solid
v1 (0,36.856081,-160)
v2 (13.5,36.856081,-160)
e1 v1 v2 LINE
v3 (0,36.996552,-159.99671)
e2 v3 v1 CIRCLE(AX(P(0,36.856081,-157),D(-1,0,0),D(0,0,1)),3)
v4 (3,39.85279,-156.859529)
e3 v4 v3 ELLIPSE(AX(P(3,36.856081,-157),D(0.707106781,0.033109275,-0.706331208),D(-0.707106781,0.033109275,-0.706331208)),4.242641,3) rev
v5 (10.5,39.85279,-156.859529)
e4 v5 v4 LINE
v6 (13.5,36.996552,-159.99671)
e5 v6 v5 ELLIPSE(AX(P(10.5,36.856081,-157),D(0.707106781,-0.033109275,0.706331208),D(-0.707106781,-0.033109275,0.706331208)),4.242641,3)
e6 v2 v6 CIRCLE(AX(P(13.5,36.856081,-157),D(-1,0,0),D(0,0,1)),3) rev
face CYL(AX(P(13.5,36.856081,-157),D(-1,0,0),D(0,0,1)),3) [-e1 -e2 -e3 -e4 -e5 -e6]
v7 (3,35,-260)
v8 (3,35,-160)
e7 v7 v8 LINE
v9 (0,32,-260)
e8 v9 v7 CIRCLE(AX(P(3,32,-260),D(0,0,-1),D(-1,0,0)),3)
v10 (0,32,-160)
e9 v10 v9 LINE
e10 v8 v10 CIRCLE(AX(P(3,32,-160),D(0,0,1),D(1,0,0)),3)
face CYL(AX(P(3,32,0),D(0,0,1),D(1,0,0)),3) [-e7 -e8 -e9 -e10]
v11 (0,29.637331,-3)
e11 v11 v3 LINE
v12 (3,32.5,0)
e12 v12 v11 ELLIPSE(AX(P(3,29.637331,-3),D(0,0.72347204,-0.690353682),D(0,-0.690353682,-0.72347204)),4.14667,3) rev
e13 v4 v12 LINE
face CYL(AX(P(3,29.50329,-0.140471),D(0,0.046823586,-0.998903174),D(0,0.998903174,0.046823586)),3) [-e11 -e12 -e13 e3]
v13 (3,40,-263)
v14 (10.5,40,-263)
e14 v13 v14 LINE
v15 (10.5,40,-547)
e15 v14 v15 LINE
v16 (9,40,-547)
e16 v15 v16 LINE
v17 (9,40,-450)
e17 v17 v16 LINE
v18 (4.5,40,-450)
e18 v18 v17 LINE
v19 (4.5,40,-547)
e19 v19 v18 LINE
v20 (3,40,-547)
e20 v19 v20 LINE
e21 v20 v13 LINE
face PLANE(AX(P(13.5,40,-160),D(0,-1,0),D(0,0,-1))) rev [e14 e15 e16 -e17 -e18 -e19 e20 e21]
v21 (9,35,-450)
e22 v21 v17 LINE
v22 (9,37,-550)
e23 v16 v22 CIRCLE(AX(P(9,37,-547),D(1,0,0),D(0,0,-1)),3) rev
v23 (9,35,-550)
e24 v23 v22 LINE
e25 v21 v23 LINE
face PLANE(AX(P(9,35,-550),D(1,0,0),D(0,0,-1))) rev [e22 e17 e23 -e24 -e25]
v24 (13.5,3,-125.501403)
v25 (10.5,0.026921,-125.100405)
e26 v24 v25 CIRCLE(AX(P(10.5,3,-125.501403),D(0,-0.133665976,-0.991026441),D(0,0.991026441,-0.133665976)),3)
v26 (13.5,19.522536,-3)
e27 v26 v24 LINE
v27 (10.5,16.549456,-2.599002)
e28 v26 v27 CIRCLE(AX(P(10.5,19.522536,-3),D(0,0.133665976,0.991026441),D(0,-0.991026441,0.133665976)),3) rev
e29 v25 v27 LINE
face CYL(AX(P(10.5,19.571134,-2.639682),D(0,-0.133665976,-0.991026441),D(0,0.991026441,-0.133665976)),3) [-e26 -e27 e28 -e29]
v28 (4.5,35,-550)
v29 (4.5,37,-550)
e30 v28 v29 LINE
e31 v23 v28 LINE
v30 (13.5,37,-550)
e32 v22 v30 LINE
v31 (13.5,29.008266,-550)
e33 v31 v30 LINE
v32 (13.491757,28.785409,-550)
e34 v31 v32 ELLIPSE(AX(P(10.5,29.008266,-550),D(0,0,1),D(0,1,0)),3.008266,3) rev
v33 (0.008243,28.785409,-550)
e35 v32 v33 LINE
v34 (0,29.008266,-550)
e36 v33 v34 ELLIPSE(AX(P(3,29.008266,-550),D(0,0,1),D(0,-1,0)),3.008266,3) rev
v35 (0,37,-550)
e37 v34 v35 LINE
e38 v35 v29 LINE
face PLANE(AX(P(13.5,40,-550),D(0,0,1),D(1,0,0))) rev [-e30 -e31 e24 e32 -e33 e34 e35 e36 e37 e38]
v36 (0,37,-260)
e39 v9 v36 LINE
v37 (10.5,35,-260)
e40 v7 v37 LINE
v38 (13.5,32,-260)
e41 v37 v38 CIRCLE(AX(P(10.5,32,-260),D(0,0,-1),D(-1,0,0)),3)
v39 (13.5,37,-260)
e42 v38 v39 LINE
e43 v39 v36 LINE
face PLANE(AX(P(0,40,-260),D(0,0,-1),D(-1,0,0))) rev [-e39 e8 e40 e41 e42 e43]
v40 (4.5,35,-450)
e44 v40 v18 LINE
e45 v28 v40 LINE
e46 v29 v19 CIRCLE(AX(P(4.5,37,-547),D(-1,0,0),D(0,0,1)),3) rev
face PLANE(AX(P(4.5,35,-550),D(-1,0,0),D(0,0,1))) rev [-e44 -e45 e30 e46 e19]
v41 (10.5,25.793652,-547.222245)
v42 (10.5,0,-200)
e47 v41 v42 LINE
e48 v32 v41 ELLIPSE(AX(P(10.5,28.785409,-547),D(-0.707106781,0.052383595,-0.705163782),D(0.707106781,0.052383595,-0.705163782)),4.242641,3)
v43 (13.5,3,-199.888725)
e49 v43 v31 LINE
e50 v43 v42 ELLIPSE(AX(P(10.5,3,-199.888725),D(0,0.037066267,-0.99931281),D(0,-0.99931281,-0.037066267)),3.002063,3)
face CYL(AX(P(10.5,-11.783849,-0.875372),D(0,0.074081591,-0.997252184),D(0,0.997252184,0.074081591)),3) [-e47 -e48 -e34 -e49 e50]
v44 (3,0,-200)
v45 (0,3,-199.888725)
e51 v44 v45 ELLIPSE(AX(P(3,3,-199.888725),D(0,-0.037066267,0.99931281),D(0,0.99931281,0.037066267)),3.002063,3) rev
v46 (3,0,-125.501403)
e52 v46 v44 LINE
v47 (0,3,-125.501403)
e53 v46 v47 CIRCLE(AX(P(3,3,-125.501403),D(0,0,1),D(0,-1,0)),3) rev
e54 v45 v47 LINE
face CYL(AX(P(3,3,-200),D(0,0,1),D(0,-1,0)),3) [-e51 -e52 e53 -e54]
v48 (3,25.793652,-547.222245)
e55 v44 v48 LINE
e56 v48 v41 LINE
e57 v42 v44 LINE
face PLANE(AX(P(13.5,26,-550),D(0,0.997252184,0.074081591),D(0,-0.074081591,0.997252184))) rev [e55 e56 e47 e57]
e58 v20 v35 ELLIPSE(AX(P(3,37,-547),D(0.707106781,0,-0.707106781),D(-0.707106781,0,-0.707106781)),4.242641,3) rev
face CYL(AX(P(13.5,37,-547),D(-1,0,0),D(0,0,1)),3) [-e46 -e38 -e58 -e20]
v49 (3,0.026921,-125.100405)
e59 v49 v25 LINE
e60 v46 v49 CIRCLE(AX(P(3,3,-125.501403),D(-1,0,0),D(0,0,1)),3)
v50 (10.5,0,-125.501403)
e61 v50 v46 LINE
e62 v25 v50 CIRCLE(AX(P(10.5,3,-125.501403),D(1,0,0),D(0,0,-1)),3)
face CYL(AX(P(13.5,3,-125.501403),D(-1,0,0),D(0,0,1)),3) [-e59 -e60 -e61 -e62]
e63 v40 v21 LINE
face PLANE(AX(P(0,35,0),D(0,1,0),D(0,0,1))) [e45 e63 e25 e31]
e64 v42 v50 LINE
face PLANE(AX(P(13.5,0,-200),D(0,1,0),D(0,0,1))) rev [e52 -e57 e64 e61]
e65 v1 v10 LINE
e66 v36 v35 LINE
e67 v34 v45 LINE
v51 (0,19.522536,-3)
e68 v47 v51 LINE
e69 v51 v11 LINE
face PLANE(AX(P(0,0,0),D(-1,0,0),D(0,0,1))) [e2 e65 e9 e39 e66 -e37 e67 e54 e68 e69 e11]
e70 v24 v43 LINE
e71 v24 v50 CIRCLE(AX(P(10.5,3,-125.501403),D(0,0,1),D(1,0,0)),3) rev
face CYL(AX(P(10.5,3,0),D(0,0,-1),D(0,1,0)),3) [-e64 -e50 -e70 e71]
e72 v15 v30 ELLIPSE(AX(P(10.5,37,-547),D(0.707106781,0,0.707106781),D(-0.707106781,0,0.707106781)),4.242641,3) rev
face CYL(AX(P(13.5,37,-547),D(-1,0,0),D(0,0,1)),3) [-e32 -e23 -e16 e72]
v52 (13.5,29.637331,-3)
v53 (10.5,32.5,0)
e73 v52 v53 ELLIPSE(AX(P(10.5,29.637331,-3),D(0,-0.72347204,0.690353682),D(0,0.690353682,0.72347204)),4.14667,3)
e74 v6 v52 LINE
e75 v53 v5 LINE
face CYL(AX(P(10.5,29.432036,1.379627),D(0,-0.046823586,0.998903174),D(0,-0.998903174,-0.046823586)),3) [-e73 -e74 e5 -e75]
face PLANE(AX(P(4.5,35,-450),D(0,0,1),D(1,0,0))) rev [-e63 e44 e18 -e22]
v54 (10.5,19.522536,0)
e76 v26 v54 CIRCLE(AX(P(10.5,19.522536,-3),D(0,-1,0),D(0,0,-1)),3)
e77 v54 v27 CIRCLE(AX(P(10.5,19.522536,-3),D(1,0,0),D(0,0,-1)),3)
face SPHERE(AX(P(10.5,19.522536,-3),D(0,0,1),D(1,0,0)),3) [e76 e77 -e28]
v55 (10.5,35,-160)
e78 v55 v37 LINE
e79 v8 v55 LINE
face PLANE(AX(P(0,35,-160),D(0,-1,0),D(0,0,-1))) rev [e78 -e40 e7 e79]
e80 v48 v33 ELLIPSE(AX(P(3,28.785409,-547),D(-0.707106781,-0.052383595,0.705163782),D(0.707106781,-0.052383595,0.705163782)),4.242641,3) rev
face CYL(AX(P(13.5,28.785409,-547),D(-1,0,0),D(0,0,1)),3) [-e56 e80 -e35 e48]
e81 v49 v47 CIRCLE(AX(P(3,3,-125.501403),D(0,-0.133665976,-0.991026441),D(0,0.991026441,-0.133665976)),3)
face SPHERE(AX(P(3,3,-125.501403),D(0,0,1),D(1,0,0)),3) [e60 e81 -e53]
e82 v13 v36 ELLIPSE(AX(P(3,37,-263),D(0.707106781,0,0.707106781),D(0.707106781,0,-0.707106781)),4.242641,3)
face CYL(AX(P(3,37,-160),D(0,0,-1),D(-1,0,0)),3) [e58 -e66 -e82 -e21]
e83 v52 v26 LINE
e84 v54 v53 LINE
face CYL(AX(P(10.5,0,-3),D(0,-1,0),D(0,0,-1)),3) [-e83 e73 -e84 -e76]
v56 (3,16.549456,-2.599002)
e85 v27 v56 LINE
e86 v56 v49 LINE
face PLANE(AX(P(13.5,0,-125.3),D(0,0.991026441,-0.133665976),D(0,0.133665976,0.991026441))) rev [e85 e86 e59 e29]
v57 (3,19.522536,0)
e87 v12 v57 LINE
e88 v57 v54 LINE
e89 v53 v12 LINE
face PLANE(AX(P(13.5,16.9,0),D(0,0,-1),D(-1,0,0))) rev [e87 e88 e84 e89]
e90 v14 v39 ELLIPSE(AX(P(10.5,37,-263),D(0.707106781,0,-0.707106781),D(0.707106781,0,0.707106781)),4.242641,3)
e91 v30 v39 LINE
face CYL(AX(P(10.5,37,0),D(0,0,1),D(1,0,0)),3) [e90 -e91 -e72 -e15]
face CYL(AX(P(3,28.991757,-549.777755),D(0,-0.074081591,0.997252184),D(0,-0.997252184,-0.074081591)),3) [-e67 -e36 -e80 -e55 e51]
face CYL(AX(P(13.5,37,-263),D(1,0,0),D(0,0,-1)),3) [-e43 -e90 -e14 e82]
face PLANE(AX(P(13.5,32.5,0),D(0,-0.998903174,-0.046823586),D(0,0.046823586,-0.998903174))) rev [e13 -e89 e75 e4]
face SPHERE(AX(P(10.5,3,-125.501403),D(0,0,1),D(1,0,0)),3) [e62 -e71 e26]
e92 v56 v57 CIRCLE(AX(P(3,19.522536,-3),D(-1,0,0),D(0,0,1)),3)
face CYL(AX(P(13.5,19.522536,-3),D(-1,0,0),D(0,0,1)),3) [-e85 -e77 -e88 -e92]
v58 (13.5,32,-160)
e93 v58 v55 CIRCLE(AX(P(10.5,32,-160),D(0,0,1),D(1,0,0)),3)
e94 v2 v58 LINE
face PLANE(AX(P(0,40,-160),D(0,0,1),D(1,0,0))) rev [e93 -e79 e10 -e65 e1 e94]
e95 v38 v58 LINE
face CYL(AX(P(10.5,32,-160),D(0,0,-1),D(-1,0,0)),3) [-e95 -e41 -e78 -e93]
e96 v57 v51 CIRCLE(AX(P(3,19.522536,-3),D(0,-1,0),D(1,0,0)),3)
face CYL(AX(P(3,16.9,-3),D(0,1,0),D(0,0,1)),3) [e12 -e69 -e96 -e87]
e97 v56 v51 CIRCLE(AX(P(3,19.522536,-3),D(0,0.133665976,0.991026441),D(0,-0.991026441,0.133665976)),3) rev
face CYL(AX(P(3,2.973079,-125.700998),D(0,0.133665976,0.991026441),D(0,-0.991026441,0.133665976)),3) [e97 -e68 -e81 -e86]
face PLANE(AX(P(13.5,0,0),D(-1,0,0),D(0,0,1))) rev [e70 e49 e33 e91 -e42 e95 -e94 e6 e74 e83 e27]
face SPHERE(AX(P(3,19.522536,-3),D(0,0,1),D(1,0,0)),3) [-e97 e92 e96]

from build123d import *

# Parameters (mm, degrees)
BOSS_EXTRUDE1_DEPTH = 13.5
SKETCH2_W           = 100
SKETCH2_H           = 5
CUT_EXTRUDE1_DEPTH  = 552.61784779
SKETCH3_W           = 4.5
SKETCH3_H           = 100
CUT_EXTRUDE2_DEPTH  = 5
FILLET1_R           = 3


with BuildPart() as part:
    # Sketch1 → Boss-Extrude1 (new body)
    with BuildSketch(Plane(origin=(0, 0, 0), x_dir=(0, 0, -1), z_dir=(1, 0, 0))):
        Polygon((0, 16.9), (0, 32.5), (160, 40), (550, 40), (550, 26), (200, 0), (125.3, 0), align=None)
    extrude(amount=BOSS_EXTRUDE1_DEPTH)

    # Sketch2 → Cut-Extrude1 (cut, through all)
    with BuildSketch(Plane(origin=(13.5, 0, 0), x_dir=(0, 0, -1), z_dir=(1, 0, 0))):
        with Locations((210, 37.5)):
            Rectangle(SKETCH2_W, SKETCH2_H)
    extrude(amount=-CUT_EXTRUDE1_DEPTH, mode=Mode.SUBTRACT)

    # Sketch3 → Cut-Extrude2 (cut)
    with BuildSketch(Plane(origin=(0, 40, 0), x_dir=(1, 0, 0), z_dir=(0, 1, 0))):
        with Locations((6.75, 500)):
            Rectangle(SKETCH3_W, SKETCH3_H)
    extrude(amount=-CUT_EXTRUDE2_DEPTH, mode=Mode.SUBTRACT)

    # Fillet1
    # the kernel refuses this fillet: 3 mm, written as the material it takes off along each edge
    with BuildSketch(Plane(origin=(10.5, 3, -125.501402614), x_dir=(0, -1, 0), z_dir=(1, 0, 0))) as fillet1_piece_1_section:
        Polygon((0, 0), (FILLET1_R, 0), (FILLET1_R, -FILLET1_R * 0.0671342046123), (FILLET1_R * 0.991026440985, -FILLET1_R * 0.133665976478), align=None)
    fillet1_piece_1 = extrude(amount=FILLET1_R, mode=Mode.PRIVATE)
    fillet1_piece_1 = fillet1_piece_1 - Plane(origin=(10.5, 3, -125.501402614), x_dir=(0, 0.9977540881864227, -0.0669834271091007), z_dir=(1, 0, 0)) * Sphere(FILLET1_R, mode=Mode.PRIVATE)
    add(fillet1_piece_1, mode=Mode.SUBTRACT)
    with BuildSketch(Plane(origin=(10.5, 19.522535548, -3), x_dir=(0, 0, 1), z_dir=(1, 0, 0))) as fillet1_piece_2_section:
        Polygon((0, 0), (FILLET1_R, 0), (FILLET1_R, FILLET1_R * 0.874178516025), (FILLET1_R * 0.133665976478, FILLET1_R * 0.991026440985), align=None)
    fillet1_piece_2 = extrude(amount=FILLET1_R, mode=Mode.PRIVATE)
    fillet1_piece_2 = fillet1_piece_2 - Plane(origin=(10.5, 19.522535548, -3), x_dir=(0, 0.6581542461772603, -0.75288311724918), z_dir=(1, 0, 0)) * Sphere(FILLET1_R, mode=Mode.PRIVATE)
    add(fillet1_piece_2, mode=Mode.SUBTRACT)
    with BuildSketch(Plane(origin=(3, 3, -125.501402614), x_dir=(0, -1, 0), z_dir=(-1, 0, 0))) as fillet1_piece_3_section:
        Polygon((0, 0), (FILLET1_R, 0), (FILLET1_R, FILLET1_R * 0.0671342046123), (FILLET1_R * 0.991026440985, FILLET1_R * 0.133665976478), align=None)
    fillet1_piece_3 = extrude(amount=FILLET1_R, mode=Mode.PRIVATE)
    fillet1_piece_3 = fillet1_piece_3 - Plane(origin=(3, 3, -125.501402614), x_dir=(0, 0.9977540881864227, -0.0669834271091007), z_dir=(-1, 0, 0)) * Sphere(FILLET1_R, mode=Mode.PRIVATE)
    add(fillet1_piece_3, mode=Mode.SUBTRACT)
    with BuildSketch(Plane(origin=(3, 19.522535548, -3), x_dir=(0, 0, 1), z_dir=(-1, 0, 0))) as fillet1_piece_4_section:
        Polygon((0, 0), (FILLET1_R, 0), (FILLET1_R, -FILLET1_R * 0.874178516025), (FILLET1_R * 0.133665976478, -FILLET1_R * 0.991026440985), align=None)
    fillet1_piece_4 = extrude(amount=FILLET1_R, mode=Mode.PRIVATE)
    fillet1_piece_4 = fillet1_piece_4 - Plane(origin=(3, 19.522535548, -3), x_dir=(0, 0.6581542461772603, -0.75288311724918), z_dir=(-1, 0, 0)) * Sphere(FILLET1_R, mode=Mode.PRIVATE)
    add(fillet1_piece_4, mode=Mode.SUBTRACT)
    with BuildSketch(Plane(origin=(0, 32.148823103, 7.491773808), x_dir=(1, 0, 0), z_dir=(0, 0.046823586298586156, -0.998903174369838))) as fillet1_piece_5:
        with BuildLine():
            CenterArc((FILLET1_R, FILLET1_R), FILLET1_R, 180, 90)
            Line((0, FILLET1_R), (0, 0))
            Line((0, 0), (FILLET1_R, 0))
        make_face()
    extrude(amount=175.175684796, mode=Mode.SUBTRACT)
    with BuildSketch(Plane(origin=(-7.859797725, 40, -160), x_dir=(0, -0.046823586298585164, 0.998903174369838), z_dir=(1, 0, 0))) as fillet1_piece_6:
        with BuildLine():
            CenterArc((FILLET1_R * 1.04797302998, FILLET1_R), FILLET1_R, 177.316224841, 92.683775159)
            Line((FILLET1_R * 0.0490698556077, FILLET1_R * 1.0468235863), (0, 0))
            Line((0, 0), (FILLET1_R * 1.04797302998, 0))
        make_face()
    extrude(amount=29.21959545, mode=Mode.SUBTRACT)
    with BuildSketch(Plane(origin=(1.5, 40, -550), x_dir=(0, -1, 0), z_dir=(1, 0, 0)), Plane(origin=(-7.5, 40, -550), x_dir=(0, -1, 0), z_dir=(1, 0, 0))) as fillet1_piece_7:
        with BuildLine():
            CenterArc((FILLET1_R, -FILLET1_R), FILLET1_R, 90, 90)
            Line((0, -FILLET1_R), (0, 0))
            Line((0, 0), (FILLET1_R, 0))
        make_face()
    extrude(amount=19.5, mode=Mode.SUBTRACT)
    with BuildSketch(Plane(origin=(-6.96352255, 26, -550), x_dir=(0, -0.07408159078957711, 0.9972521837058496), z_dir=(1, 0, 0))) as fillet1_piece_8:
        with BuildLine():
            CenterArc((FILLET1_R * 0.928469673307, -FILLET1_R), FILLET1_R, 90, 85.751545471)
            Line((-FILLET1_R * 0.0687825103985, -FILLET1_R * 0.92591840921), (0, 0))
            Line((0, 0), (FILLET1_R * 0.928469673307, 0))
        make_face()
    extrude(amount=27.4270451, mode=Mode.SUBTRACT)
    with BuildSketch(Plane(origin=(13.5, 0.026920677, -125.100404684), x_dir=(-1, 0, 0), z_dir=(0, 0.1336659764776849, 0.9910264409854396))) as fillet1_piece_9:
        with BuildLine():
            CenterArc((FILLET1_R, -FILLET1_R), FILLET1_R, 90, 90)
            Line((0, -FILLET1_R), (0, 0))
            Line((0, 0), (FILLET1_R, 0))
        make_face()
    extrude(amount=123.610629896, mode=Mode.SUBTRACT)
    with BuildSketch(Plane(origin=(3, 0, -125.3), x_dir=(0, 0.1336659764776861, 0.9910264409854393), z_dir=(1, 0, 0))) as fillet1_piece_10:
        with BuildLine():
            CenterArc((FILLET1_R * 0.0671342046123, -FILLET1_R), FILLET1_R, 90, 7.68148685)
            Line((-FILLET1_R * 0.0665317718654, -FILLET1_R * 0.00897355901456), (0, 0))
            Line((0, 0), (FILLET1_R * 0.0671342046123, 0))
        make_face()
    extrude(amount=7.5, mode=Mode.SUBTRACT)
    with BuildSketch(Plane(origin=(3, 16.9, 0), x_dir=(0, 1, 0), z_dir=(1, 0, 0))) as fillet1_piece_11:
        with BuildLine():
            CenterArc((FILLET1_R * 0.874178516025, -FILLET1_R), FILLET1_R, 90, 82.31851315)
            Line((-FILLET1_R * 0.11684792496, -FILLET1_R * 0.866334023522), (0, 0))
            Line((0, 0), (FILLET1_R * 0.874178516025, 0))
        make_face()
    extrude(amount=7.5, mode=Mode.SUBTRACT)
    with BuildSketch(Plane(origin=(13.5, 0, -207.5), x_dir=(0, 1, 0), z_dir=(0, 0, 1))) as fillet1_piece_12:
        with BuildLine():
            CenterArc((FILLET1_R, FILLET1_R), FILLET1_R, 180, 90)
            Line((0, FILLET1_R), (0, 0))
            Line((0, 0), (FILLET1_R, 0))
        make_face()
    extrude(amount=81.998597386, mode=Mode.SUBTRACT)
    with BuildSketch(Plane(origin=(13.5, 26.555611931, -557.479391378), x_dir=(0, 0.9972521837058497, 0.07408159078957739), z_dir=(0, -0.0740815907895774, 0.9972521837058497))) as fillet1_piece_13:
        with BuildLine():
            CenterArc((FILLET1_R, FILLET1_R), FILLET1_R, 180, 90)
            Line((0, FILLET1_R), (0, 0))
            Line((0, 0), (FILLET1_R, 0))
        make_face()
    extrude(amount=365.964385658, mode=Mode.SUBTRACT)
    with BuildSketch(Plane(origin=(21, 40, -260), x_dir=(0, 0, -1), z_dir=(-1, 0, 0))) as fillet1_piece_14:
        with BuildLine():
            CenterArc((FILLET1_R, FILLET1_R), FILLET1_R, 180, 90)
            Line((0, FILLET1_R), (0, 0))
            Line((0, 0), (FILLET1_R, 0))
        make_face()
    extrude(amount=28.5, mode=Mode.SUBTRACT)
    with BuildSketch(Plane(origin=(0, 35, -160), x_dir=(0, -1, 0), z_dir=(0, 0, -1)), Plane(origin=(13.5, 35, -260), x_dir=(0, -1, 0), z_dir=(0, 0, 1))) as fillet1_piece_15:
        with BuildLine():
            CenterArc((FILLET1_R, -FILLET1_R), FILLET1_R, 90, 90)
            Line((0, -FILLET1_R), (0, 0))
            Line((0, 0), (FILLET1_R, 0))
        make_face()
    extrude(amount=100, mode=Mode.SUBTRACT)
    with BuildSketch(Plane(origin=(13.5, 40, -252.5), x_dir=(0, -1, 0), z_dir=(0, 0, -1))) as fillet1_piece_16:
        with BuildLine():
            CenterArc((FILLET1_R, FILLET1_R), FILLET1_R, 180, 90)
            Line((0, FILLET1_R), (0, 0))
            Line((0, 0), (FILLET1_R, 0))
        make_face()
    extrude(amount=305, mode=Mode.SUBTRACT)
    with BuildSketch(Plane(origin=(13.5, 32.148823103, 7.491773808), x_dir=(-1, 0, 0), z_dir=(0, 0.046823586298586156, -0.998903174369838))) as fillet1_piece_17:
        with BuildLine():
            CenterArc((FILLET1_R, -FILLET1_R), FILLET1_R, 90, 90)
            Line((0, -FILLET1_R), (0, 0))
            Line((0, 0), (FILLET1_R, 0))
        make_face()
    extrude(amount=175.175684796, mode=Mode.SUBTRACT)
    with BuildSketch(Plane(origin=(0, 40, -252.5), x_dir=(0, -1, 0), z_dir=(0, 0, -1))) as fillet1_piece_18:
        with BuildLine():
            CenterArc((FILLET1_R, -FILLET1_R), FILLET1_R, 90, 90)
            Line((0, -FILLET1_R), (0, 0))
            Line((0, 0), (FILLET1_R, 0))
        make_face()
    extrude(amount=305, mode=Mode.SUBTRACT)
    with BuildSketch(Plane(origin=(0, 26.555611931, -557.479391378), x_dir=(0, 0.9972521837058497, 0.07408159078957739), z_dir=(0, -0.0740815907895774, 0.9972521837058497))) as fillet1_piece_19:
        with BuildLine():
            CenterArc((FILLET1_R, -FILLET1_R), FILLET1_R, 90, 90)
            Line((0, -FILLET1_R), (0, 0))
            Line((0, 0), (FILLET1_R, 0))
        make_face()
    extrude(amount=365.964385658, mode=Mode.SUBTRACT)
    with BuildSketch(Plane(origin=(0, 0, -207.5), x_dir=(0, 1, 0), z_dir=(0, 0, 1))) as fillet1_piece_20:
        with BuildLine():
            CenterArc((FILLET1_R, -FILLET1_R), FILLET1_R, 90, 90)
            Line((0, -FILLET1_R), (0, 0))
            Line((0, 0), (FILLET1_R, 0))
        make_face()
    extrude(amount=81.998597386, mode=Mode.SUBTRACT)
    with BuildSketch(Plane(origin=(13.5, 19.522535548, 0), x_dir=(-1, 0, 0), z_dir=(0, 1, 0))) as fillet1_piece_21:
        with BuildLine():
            CenterArc((FILLET1_R, -FILLET1_R), FILLET1_R, 90, 90)
            Line((0, -FILLET1_R), (0, 0))
            Line((0, 0), (FILLET1_R, 0))
        make_face()
    extrude(amount=20.477464452, mode=Mode.SUBTRACT)
    with BuildSketch(Plane(origin=(0, 0.026920677, -125.100404684), x_dir=(1, 0, 0), z_dir=(0, 0.1336659764776849, 0.9910264409854396))) as fillet1_piece_22:
        with BuildLine():
            CenterArc((FILLET1_R, FILLET1_R), FILLET1_R, 180, 90)
            Line((0, FILLET1_R), (0, 0))
            Line((0, 0), (FILLET1_R, 0))
        make_face()
    extrude(amount=123.610629896, mode=Mode.SUBTRACT)
    with BuildSketch(Plane(origin=(0, 19.522535548, 0), x_dir=(1, 0, 0), z_dir=(0, 1, 0))) as fillet1_piece_23:
        with BuildLine():
            CenterArc((FILLET1_R, FILLET1_R), FILLET1_R, 180, 90)
            Line((0, FILLET1_R), (0, 0))
            Line((0, 0), (FILLET1_R, 0))
        make_face()
    extrude(amount=20.477464452, mode=Mode.SUBTRACT)


solid = part.part
